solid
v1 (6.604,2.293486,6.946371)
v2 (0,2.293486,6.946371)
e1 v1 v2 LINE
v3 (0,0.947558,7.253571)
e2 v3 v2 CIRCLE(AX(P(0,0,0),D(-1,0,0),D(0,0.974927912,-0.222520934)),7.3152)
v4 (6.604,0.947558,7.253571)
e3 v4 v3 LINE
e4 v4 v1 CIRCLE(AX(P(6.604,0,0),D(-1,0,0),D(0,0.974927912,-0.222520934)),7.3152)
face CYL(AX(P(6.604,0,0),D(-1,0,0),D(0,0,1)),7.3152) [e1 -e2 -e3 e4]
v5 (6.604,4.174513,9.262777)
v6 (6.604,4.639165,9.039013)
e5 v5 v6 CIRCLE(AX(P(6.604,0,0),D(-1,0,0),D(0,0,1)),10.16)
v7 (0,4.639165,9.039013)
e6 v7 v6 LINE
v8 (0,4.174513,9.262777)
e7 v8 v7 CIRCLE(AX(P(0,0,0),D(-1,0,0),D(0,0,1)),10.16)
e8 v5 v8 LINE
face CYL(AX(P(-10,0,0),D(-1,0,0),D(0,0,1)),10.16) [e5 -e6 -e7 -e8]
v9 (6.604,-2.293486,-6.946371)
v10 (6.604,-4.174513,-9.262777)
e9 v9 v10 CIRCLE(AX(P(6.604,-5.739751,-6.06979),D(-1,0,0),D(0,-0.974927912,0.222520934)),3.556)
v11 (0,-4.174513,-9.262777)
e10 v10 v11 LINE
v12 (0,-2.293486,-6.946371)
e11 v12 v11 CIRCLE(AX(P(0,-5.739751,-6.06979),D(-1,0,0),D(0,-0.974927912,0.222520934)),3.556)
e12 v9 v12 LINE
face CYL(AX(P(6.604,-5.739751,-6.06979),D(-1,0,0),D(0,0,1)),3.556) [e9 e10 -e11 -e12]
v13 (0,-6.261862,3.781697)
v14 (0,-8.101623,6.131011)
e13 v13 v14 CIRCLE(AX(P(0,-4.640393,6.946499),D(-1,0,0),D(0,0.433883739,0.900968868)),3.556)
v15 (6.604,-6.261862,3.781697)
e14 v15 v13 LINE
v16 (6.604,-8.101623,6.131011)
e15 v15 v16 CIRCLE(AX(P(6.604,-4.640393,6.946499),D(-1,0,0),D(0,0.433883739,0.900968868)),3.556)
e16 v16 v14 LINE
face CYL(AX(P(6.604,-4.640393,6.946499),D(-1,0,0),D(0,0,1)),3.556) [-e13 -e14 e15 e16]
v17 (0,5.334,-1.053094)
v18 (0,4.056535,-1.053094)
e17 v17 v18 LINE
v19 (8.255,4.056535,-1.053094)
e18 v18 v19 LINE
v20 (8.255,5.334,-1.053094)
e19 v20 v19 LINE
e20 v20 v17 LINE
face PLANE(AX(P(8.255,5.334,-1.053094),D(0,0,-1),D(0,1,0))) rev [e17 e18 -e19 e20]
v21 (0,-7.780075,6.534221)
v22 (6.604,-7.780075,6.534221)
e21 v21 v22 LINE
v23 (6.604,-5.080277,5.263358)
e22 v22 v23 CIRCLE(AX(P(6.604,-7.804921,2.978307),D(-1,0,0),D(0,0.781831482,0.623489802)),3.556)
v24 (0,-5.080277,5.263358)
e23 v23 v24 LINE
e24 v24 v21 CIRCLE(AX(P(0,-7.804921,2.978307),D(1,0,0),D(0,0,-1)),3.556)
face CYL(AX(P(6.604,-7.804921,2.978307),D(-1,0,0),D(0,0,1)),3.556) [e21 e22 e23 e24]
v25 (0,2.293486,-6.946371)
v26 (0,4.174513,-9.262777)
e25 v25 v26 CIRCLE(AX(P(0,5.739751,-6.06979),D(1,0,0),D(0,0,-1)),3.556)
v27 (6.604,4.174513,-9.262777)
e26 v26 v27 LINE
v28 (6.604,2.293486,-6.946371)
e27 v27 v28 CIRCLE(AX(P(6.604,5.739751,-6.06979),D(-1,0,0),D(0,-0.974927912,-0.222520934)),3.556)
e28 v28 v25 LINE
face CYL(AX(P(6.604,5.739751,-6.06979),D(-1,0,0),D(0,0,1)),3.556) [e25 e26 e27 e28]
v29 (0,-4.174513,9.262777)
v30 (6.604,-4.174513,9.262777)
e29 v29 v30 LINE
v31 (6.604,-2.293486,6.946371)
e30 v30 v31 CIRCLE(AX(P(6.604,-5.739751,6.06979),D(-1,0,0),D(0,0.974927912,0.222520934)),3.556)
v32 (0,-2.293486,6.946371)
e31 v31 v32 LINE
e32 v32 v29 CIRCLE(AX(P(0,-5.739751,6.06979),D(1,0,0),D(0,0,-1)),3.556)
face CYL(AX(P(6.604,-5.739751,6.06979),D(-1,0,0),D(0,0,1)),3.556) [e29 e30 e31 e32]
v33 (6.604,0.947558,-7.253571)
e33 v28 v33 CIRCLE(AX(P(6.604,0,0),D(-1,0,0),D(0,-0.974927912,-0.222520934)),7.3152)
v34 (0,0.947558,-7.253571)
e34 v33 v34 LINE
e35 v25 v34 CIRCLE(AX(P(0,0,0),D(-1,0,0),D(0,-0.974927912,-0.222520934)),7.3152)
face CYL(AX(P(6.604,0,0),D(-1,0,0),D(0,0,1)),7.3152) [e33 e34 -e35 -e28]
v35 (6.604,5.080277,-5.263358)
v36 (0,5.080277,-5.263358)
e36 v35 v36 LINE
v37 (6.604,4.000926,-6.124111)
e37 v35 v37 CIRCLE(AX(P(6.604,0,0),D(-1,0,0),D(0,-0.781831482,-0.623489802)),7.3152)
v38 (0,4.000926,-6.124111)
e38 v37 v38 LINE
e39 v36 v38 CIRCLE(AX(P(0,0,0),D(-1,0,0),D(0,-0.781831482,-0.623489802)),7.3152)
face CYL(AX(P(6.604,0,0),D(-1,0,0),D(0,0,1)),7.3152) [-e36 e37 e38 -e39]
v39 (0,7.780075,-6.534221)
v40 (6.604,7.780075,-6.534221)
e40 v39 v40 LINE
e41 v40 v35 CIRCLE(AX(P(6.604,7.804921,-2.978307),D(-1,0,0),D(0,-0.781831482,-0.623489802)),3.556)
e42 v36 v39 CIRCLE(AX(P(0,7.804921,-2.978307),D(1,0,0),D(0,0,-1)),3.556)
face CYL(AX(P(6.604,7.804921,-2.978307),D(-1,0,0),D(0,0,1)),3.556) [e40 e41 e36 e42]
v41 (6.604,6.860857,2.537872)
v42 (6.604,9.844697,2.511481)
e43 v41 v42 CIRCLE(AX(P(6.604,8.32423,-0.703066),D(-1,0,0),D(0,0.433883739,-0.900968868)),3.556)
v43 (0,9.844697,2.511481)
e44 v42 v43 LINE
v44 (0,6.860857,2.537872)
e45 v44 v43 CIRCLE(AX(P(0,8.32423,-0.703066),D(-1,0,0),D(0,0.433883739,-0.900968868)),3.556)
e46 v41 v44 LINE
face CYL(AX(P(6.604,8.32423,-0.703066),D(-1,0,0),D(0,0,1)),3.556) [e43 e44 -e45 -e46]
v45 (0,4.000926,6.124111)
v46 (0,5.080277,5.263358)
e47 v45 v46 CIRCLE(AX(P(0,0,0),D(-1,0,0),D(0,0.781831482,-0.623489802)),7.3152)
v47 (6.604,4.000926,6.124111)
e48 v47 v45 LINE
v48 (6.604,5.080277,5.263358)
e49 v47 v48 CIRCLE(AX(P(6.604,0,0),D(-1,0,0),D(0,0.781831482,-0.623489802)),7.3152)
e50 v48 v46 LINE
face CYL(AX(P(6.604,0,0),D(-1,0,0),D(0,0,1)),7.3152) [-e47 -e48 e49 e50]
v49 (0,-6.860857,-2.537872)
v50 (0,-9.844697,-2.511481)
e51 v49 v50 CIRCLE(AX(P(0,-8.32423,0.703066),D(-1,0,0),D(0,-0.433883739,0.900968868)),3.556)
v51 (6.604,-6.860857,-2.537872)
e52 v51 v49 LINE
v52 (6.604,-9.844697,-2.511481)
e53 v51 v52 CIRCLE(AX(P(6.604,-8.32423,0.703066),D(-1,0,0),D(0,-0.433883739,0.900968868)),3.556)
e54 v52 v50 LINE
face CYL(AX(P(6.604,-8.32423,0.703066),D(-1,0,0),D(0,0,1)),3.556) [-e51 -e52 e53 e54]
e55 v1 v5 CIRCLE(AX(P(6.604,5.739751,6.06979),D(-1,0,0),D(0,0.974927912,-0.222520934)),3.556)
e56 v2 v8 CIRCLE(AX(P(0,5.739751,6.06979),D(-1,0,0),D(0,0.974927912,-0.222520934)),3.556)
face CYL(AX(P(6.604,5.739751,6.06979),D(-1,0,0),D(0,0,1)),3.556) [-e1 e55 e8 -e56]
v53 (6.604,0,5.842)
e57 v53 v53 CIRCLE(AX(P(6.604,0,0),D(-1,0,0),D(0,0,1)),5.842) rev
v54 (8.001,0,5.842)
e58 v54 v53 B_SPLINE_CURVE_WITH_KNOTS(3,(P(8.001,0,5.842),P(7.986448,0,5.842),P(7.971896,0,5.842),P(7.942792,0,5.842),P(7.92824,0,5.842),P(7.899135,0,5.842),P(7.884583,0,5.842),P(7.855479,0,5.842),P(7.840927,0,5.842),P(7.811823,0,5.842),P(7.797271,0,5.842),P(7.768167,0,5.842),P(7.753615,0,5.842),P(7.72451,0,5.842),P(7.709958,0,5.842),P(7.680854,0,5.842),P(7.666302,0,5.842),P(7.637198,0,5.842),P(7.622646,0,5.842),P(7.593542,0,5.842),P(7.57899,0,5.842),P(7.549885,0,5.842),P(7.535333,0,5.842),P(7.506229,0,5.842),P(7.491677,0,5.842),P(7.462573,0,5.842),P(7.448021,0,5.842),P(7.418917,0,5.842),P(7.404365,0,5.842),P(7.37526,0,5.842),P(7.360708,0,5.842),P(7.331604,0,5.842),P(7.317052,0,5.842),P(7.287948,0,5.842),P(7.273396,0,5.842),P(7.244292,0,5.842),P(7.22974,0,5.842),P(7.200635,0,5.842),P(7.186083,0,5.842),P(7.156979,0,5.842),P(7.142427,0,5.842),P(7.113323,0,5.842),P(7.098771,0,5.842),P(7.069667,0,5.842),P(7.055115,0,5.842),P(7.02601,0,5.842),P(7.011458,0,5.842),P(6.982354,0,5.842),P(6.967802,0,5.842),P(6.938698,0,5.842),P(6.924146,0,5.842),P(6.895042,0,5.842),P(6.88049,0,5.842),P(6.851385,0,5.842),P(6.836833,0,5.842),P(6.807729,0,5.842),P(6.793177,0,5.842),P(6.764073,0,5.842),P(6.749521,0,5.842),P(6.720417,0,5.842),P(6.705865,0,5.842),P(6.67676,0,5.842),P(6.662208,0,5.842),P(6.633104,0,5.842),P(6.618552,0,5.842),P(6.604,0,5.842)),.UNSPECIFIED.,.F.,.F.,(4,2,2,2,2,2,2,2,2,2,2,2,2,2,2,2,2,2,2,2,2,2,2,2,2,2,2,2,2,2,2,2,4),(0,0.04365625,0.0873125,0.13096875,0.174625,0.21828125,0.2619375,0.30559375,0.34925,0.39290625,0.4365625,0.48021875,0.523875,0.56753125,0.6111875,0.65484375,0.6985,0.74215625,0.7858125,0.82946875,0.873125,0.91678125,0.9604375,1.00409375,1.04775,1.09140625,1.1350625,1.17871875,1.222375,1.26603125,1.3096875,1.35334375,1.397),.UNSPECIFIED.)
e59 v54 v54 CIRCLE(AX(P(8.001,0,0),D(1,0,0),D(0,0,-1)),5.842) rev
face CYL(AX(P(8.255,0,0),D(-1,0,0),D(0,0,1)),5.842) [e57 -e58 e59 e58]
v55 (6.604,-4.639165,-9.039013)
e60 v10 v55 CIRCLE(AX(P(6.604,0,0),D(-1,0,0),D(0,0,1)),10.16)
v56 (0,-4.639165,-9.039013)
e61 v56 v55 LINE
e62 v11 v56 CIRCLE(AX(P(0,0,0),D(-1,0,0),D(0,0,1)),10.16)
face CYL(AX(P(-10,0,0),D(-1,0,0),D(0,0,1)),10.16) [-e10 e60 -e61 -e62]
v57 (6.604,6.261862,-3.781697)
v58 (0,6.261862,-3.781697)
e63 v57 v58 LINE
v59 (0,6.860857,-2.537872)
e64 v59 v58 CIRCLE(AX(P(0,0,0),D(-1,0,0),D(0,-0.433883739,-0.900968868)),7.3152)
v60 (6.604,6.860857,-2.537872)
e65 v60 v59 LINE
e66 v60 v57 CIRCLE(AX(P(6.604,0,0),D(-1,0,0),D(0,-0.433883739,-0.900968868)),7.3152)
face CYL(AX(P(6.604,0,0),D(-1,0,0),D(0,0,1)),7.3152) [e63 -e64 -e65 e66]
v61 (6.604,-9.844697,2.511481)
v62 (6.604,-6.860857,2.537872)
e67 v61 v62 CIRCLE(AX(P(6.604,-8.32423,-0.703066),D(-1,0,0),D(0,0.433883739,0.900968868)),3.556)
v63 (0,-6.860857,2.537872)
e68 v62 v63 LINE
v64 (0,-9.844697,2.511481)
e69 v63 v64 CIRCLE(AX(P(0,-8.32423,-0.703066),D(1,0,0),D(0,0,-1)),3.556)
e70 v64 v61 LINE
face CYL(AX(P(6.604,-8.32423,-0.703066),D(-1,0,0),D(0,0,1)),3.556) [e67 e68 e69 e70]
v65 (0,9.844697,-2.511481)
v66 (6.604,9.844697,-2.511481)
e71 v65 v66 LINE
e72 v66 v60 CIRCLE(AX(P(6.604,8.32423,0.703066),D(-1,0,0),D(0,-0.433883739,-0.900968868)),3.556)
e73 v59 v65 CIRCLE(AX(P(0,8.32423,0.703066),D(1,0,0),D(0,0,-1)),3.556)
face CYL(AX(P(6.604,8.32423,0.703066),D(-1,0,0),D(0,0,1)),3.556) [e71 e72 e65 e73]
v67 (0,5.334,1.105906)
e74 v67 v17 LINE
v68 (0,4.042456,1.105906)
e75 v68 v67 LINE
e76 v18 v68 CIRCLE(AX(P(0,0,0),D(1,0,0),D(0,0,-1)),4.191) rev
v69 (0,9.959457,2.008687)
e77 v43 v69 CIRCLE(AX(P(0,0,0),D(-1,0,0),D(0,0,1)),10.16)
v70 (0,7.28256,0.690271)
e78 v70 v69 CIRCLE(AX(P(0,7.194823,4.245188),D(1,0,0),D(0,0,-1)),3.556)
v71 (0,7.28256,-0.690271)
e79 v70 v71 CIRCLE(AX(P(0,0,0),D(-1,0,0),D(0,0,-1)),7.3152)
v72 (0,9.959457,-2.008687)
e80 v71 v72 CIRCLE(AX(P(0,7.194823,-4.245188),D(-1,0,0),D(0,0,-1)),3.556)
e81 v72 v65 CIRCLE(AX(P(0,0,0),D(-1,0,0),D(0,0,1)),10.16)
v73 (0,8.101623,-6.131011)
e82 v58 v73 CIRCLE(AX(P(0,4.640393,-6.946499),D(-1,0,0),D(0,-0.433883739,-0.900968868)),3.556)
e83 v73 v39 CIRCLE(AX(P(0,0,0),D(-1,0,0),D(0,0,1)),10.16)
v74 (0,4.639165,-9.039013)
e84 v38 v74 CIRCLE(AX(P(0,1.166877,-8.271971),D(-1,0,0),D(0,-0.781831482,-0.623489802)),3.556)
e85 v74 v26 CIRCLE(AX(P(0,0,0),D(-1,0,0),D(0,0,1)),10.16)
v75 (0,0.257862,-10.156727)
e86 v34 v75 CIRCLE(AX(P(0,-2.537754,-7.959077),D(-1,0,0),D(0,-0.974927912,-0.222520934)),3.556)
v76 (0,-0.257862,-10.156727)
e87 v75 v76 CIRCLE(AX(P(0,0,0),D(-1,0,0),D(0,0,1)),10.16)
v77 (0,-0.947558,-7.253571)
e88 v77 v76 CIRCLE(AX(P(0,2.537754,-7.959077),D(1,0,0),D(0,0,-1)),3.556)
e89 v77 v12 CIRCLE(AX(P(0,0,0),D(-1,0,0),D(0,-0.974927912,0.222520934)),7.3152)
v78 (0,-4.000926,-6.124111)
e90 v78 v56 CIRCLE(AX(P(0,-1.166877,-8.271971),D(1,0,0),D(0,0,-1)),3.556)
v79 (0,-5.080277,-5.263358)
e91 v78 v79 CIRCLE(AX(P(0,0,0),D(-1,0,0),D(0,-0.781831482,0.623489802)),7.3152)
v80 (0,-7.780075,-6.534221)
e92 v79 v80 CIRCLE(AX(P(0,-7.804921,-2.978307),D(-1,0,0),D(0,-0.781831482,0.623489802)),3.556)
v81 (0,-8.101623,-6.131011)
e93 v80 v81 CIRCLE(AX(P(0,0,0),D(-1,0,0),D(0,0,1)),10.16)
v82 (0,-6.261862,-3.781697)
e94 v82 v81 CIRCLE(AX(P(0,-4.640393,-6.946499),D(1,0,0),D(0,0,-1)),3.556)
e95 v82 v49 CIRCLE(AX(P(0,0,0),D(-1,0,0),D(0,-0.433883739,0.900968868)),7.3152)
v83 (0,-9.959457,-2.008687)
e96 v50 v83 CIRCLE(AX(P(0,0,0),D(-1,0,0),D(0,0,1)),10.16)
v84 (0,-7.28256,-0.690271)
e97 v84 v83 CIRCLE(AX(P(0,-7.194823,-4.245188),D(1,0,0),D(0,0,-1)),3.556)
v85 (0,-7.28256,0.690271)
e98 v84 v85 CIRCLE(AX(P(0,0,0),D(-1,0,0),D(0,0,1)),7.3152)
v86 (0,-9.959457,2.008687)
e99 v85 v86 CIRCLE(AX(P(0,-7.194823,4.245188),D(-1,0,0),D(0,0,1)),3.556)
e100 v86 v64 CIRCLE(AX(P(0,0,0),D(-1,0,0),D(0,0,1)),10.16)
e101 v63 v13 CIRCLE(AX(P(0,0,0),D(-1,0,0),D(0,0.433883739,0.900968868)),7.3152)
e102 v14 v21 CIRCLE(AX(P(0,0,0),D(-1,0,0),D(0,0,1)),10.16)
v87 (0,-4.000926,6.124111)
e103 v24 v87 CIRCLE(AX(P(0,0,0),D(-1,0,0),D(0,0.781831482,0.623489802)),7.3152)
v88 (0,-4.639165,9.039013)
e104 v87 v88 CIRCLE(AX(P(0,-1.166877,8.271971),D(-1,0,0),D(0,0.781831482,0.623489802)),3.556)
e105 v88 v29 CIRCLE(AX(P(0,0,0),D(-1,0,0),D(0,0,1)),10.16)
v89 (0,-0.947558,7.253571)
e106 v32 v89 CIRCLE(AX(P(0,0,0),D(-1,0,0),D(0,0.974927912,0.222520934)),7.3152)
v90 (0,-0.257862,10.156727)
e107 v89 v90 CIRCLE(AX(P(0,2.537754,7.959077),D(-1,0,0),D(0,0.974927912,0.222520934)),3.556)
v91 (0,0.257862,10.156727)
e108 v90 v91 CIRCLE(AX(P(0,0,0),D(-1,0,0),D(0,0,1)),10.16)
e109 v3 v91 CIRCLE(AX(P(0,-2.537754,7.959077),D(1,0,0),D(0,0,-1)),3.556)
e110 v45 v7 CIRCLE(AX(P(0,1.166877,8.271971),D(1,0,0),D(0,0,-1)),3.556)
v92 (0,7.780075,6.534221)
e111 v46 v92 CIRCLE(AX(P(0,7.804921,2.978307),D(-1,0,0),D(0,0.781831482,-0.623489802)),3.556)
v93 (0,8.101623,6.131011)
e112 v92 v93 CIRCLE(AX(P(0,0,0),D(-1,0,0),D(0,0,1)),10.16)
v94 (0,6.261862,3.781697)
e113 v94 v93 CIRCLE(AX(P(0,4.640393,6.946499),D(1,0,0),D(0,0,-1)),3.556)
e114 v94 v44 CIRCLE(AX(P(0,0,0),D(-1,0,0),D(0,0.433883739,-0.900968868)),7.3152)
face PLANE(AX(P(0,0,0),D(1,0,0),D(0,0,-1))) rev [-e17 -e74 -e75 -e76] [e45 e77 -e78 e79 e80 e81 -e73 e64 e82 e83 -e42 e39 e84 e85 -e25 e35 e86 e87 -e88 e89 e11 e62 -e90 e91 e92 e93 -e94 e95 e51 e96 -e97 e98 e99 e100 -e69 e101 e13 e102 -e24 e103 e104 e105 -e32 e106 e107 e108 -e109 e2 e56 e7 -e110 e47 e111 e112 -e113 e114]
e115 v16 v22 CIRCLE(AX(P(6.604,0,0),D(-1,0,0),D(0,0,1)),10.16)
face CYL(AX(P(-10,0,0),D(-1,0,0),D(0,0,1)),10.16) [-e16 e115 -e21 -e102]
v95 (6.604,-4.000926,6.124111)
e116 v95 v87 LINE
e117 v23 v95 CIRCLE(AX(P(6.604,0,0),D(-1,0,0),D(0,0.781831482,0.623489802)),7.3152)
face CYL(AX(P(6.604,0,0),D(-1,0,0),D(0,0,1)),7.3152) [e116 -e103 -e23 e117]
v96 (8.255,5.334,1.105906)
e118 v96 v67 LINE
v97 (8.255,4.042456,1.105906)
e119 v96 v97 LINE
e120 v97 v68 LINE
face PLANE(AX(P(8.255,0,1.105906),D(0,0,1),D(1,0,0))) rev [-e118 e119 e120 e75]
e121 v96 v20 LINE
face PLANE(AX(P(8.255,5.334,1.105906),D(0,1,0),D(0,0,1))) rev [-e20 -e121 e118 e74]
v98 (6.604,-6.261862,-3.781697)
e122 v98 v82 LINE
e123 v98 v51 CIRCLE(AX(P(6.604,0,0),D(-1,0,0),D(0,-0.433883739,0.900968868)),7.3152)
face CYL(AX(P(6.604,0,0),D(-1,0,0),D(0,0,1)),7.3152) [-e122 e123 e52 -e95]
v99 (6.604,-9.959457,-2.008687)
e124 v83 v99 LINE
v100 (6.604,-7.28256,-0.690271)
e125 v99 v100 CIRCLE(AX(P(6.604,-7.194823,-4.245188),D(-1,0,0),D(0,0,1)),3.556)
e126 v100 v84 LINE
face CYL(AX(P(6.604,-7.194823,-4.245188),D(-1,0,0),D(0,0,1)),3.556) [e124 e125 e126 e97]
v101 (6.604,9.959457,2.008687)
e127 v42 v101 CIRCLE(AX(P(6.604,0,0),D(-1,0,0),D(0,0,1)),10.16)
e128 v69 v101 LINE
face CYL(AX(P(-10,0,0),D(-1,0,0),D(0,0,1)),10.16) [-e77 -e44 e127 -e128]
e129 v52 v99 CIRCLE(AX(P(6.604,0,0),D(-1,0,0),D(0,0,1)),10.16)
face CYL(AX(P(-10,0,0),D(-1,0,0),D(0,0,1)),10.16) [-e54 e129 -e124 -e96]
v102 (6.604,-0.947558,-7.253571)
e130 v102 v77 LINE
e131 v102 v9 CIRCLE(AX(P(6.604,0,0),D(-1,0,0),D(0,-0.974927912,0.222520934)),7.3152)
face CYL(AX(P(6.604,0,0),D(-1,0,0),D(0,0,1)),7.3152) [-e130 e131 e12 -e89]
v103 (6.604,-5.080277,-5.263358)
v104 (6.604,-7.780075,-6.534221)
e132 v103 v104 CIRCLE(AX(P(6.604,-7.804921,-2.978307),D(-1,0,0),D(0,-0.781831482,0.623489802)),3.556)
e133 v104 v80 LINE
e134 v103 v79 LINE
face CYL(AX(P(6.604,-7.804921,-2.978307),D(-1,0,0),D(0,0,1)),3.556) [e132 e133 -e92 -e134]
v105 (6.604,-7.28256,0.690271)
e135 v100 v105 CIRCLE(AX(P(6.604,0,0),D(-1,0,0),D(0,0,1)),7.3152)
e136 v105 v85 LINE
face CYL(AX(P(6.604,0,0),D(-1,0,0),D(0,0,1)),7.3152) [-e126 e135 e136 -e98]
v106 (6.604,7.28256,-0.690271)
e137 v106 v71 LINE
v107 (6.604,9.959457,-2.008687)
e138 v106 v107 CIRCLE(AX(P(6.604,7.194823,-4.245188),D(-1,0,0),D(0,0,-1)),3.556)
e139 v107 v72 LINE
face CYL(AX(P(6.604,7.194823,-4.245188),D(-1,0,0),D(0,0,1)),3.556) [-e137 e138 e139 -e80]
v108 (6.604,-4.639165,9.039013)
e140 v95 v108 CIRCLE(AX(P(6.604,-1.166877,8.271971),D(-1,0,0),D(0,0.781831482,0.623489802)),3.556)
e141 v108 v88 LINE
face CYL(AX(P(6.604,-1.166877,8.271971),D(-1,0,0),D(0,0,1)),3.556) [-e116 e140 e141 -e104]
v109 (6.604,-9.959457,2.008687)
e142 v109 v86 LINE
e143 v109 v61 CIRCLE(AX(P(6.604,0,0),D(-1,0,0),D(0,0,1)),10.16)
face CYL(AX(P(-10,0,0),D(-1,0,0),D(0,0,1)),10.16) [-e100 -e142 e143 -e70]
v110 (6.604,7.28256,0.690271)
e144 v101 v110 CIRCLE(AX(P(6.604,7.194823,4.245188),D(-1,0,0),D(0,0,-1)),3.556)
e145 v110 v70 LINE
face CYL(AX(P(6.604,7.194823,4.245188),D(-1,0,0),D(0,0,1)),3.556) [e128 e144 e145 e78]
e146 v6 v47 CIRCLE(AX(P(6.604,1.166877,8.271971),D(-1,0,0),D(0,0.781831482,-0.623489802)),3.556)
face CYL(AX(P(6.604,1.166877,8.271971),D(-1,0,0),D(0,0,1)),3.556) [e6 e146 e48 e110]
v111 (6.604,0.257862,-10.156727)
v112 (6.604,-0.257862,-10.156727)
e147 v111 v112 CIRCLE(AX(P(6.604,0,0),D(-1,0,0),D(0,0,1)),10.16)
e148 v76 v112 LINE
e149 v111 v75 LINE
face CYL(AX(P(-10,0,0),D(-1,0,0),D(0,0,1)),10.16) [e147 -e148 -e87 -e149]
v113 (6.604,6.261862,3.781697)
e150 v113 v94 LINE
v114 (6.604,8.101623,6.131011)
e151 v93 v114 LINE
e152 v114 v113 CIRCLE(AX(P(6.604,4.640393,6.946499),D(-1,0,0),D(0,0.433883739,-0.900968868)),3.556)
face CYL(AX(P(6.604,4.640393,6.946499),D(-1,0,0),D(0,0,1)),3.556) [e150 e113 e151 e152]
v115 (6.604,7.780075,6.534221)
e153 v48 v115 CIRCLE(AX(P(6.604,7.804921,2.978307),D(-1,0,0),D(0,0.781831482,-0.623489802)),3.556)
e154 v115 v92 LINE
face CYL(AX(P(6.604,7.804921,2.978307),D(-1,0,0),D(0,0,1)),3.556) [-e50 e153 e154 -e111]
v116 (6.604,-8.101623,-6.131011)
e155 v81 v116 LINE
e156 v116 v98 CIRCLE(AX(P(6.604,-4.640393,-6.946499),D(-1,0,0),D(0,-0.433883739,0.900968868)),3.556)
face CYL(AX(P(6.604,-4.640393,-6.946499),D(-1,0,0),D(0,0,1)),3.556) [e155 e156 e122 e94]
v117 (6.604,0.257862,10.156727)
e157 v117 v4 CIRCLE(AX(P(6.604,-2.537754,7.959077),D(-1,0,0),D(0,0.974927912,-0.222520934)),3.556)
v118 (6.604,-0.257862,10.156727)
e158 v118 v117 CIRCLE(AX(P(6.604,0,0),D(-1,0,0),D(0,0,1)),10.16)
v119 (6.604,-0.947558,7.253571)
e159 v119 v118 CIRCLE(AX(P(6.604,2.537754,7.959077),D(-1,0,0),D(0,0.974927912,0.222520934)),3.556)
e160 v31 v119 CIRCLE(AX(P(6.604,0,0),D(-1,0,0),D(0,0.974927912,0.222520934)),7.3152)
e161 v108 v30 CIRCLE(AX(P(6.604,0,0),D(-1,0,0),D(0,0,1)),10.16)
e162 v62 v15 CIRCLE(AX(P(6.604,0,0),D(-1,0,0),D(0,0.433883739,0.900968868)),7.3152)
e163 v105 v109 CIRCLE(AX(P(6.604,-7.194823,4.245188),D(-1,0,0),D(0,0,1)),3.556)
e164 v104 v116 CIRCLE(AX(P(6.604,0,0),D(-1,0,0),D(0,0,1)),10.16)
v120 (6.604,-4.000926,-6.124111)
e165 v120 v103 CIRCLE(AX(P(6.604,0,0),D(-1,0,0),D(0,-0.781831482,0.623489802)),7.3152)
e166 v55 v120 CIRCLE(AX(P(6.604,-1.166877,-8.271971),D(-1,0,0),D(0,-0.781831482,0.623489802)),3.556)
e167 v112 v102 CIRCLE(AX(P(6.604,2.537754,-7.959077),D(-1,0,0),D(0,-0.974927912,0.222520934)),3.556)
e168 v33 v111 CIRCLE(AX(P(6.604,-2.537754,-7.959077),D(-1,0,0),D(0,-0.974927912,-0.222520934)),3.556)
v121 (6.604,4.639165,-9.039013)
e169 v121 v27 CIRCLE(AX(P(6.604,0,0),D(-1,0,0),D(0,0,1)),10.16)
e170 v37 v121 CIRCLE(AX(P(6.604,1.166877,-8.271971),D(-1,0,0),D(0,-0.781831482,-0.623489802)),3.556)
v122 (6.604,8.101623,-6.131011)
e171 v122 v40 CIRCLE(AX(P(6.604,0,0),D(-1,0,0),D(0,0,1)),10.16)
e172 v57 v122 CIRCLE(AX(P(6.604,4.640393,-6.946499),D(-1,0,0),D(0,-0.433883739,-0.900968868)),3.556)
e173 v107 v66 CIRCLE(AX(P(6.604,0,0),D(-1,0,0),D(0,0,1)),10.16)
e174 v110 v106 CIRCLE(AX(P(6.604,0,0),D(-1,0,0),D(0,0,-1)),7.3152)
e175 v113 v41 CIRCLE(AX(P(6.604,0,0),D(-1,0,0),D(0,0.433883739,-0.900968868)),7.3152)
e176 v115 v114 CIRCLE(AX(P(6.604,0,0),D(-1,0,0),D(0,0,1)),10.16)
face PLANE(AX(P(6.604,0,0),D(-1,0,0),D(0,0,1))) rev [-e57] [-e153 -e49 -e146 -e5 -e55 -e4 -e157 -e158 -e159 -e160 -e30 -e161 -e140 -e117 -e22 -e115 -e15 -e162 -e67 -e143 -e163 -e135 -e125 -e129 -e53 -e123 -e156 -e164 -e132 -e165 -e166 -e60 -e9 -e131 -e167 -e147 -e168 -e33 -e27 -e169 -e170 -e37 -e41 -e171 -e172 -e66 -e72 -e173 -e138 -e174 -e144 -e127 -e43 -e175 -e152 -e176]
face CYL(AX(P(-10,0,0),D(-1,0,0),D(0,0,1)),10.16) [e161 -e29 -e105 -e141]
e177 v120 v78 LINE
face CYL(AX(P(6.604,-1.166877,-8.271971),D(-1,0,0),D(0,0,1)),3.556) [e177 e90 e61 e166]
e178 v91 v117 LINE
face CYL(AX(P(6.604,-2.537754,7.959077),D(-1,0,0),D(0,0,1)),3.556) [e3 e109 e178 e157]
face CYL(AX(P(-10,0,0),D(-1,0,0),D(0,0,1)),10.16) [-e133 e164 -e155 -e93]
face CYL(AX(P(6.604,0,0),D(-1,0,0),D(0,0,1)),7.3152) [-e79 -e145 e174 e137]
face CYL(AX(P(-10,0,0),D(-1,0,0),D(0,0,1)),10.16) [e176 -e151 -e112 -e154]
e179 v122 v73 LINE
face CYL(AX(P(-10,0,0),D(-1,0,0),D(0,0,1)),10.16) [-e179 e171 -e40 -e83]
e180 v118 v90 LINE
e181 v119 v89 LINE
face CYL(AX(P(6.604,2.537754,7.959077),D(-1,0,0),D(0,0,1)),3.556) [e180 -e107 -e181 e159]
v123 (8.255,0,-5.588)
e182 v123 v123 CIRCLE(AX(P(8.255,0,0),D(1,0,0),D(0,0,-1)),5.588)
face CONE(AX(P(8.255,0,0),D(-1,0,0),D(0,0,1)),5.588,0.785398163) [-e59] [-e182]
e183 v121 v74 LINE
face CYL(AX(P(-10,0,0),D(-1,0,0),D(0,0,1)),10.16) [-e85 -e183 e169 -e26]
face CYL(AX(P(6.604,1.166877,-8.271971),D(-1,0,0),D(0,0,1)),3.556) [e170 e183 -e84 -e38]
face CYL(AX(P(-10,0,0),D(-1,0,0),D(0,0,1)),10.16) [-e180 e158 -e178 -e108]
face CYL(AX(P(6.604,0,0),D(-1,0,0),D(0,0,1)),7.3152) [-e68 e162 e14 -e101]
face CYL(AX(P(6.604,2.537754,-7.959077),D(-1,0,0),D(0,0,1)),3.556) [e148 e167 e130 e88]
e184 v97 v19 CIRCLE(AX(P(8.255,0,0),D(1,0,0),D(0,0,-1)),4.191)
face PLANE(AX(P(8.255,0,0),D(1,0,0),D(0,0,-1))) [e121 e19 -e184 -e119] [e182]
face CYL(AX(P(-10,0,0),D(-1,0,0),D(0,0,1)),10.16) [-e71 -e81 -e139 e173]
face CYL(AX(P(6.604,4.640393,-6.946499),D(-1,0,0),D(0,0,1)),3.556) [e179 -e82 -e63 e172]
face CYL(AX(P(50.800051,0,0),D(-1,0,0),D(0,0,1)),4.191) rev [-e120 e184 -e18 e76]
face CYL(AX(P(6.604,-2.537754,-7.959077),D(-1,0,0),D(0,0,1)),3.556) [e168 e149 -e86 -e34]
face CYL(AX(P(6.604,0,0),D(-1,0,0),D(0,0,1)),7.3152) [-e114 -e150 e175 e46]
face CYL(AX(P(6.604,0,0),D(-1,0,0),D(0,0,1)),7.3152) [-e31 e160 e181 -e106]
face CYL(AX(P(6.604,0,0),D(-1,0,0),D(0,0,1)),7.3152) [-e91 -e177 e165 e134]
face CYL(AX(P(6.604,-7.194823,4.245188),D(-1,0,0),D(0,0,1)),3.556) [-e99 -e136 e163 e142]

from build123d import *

# Parameters (mm, degrees)
BASPROSKE_W         = 6.604
BASPROSKE_H         = 10.16
TOOTHCUT_DEPTH      = 16.813412535
TEETHCUTS_COUNT     = 14
TEETHCUTS_ANGLE     = 334.285714286
BORSKE_R            = 4.191
BORE_DEPTH          = 50.8000508
BOSS_EXTRUDE1_START = 1.651
SKETCH1_R           = 5.842
SKETCH1_R_2         = 4.191
BOSS_EXTRUDE1_DEPTH = 1.651
SKETCH2_W           = 2.159
SKETCH2_H           = 5.334
CUT_EXTRUDE1_DEPTH  = 17.448750705
CHAMFER1_SIZE       = 0.254


with BuildPart() as part:
    # BasProSke → Base-Revolve (revolve)
    with BuildSketch(Plane(origin=(0, 0, 0), x_dir=(1, 0, 0), z_dir=(0, 1, 0))):
        with Locations((3.302, 5.08)):
            Rectangle(BASPROSKE_W, BASPROSKE_H)
    revolve(axis=Axis((-10, 0, 0), (1, 0, 0)))

    # TooCutSke → ToothCut (cut, through all)
    with BuildSketch(Plane(origin=(0, 0, 0), x_dir=(0, 0, -1), z_dir=(1, 0, 0))):
        with BuildLine():
            ThreePointArc((0.690270933, 7.282559789), (0, 7.3152), (-0.690270933, 7.282559789))
            ThreePointArc((-0.690270933, 7.282559789), (-1.062455419, 8.780807329), (-2.034499207, 9.980139585))
            ThreePointArc((-2.034499207, 9.980139585), (0, 10.1854), (2.034499207, 9.980139585))
            ThreePointArc((2.034499207, 9.980139585), (1.062455419, 8.780807329), (0.690270933, 7.282559789))
        make_face()
    toothcut = extrude(amount=TOOTHCUT_DEPTH, mode=Mode.SUBTRACT)

    # TeethCuts: ToothCut ×14 about axis
    teethcuts_axis = Axis((-10, 0, 0), (1, 0, 0))
    for i in range(1, TEETHCUTS_COUNT):
        add(toothcut.rotate(teethcuts_axis, i * TEETHCUTS_ANGLE / (TEETHCUTS_COUNT - 1)), mode=Mode.SUBTRACT)

    # BorSke → Bore (cut, symmetric)
    with BuildSketch(Plane(origin=(0, 0, 0), x_dir=(0, 0, -1), z_dir=(1, 0, 0))):
        Circle(BORSKE_R)
    extrude(amount=BORE_DEPTH, both=True, mode=Mode.SUBTRACT)

    # Sketch1 → Boss-Extrude1 (add)
    with BuildSketch(Plane(origin=(6.604, 0, 0), x_dir=(0, 0, -1), z_dir=(1, 0, 0)).offset(BOSS_EXTRUDE1_START)):
        Circle(SKETCH1_R)
        Circle(SKETCH1_R_2, mode=Mode.SUBTRACT)
    extrude(amount=-BOSS_EXTRUDE1_DEPTH)

    # Sketch2 → Cut-Extrude1 (cut, through all)
    with BuildSketch(Plane.ZY):
        with Locations((0.026405968, 2.667)):
            Rectangle(SKETCH2_W, SKETCH2_H)
    extrude(amount=-CUT_EXTRUDE1_DEPTH, mode=Mode.SUBTRACT)

    # Chamfer1
    chamfer1_edges = [part.edges().sort_by_distance(p)[0] for p in [
        (8.255, 0, 5.842),
    ]]
    chamfer(chamfer1_edges, length=CHAMFER1_SIZE)


solid = part.part
